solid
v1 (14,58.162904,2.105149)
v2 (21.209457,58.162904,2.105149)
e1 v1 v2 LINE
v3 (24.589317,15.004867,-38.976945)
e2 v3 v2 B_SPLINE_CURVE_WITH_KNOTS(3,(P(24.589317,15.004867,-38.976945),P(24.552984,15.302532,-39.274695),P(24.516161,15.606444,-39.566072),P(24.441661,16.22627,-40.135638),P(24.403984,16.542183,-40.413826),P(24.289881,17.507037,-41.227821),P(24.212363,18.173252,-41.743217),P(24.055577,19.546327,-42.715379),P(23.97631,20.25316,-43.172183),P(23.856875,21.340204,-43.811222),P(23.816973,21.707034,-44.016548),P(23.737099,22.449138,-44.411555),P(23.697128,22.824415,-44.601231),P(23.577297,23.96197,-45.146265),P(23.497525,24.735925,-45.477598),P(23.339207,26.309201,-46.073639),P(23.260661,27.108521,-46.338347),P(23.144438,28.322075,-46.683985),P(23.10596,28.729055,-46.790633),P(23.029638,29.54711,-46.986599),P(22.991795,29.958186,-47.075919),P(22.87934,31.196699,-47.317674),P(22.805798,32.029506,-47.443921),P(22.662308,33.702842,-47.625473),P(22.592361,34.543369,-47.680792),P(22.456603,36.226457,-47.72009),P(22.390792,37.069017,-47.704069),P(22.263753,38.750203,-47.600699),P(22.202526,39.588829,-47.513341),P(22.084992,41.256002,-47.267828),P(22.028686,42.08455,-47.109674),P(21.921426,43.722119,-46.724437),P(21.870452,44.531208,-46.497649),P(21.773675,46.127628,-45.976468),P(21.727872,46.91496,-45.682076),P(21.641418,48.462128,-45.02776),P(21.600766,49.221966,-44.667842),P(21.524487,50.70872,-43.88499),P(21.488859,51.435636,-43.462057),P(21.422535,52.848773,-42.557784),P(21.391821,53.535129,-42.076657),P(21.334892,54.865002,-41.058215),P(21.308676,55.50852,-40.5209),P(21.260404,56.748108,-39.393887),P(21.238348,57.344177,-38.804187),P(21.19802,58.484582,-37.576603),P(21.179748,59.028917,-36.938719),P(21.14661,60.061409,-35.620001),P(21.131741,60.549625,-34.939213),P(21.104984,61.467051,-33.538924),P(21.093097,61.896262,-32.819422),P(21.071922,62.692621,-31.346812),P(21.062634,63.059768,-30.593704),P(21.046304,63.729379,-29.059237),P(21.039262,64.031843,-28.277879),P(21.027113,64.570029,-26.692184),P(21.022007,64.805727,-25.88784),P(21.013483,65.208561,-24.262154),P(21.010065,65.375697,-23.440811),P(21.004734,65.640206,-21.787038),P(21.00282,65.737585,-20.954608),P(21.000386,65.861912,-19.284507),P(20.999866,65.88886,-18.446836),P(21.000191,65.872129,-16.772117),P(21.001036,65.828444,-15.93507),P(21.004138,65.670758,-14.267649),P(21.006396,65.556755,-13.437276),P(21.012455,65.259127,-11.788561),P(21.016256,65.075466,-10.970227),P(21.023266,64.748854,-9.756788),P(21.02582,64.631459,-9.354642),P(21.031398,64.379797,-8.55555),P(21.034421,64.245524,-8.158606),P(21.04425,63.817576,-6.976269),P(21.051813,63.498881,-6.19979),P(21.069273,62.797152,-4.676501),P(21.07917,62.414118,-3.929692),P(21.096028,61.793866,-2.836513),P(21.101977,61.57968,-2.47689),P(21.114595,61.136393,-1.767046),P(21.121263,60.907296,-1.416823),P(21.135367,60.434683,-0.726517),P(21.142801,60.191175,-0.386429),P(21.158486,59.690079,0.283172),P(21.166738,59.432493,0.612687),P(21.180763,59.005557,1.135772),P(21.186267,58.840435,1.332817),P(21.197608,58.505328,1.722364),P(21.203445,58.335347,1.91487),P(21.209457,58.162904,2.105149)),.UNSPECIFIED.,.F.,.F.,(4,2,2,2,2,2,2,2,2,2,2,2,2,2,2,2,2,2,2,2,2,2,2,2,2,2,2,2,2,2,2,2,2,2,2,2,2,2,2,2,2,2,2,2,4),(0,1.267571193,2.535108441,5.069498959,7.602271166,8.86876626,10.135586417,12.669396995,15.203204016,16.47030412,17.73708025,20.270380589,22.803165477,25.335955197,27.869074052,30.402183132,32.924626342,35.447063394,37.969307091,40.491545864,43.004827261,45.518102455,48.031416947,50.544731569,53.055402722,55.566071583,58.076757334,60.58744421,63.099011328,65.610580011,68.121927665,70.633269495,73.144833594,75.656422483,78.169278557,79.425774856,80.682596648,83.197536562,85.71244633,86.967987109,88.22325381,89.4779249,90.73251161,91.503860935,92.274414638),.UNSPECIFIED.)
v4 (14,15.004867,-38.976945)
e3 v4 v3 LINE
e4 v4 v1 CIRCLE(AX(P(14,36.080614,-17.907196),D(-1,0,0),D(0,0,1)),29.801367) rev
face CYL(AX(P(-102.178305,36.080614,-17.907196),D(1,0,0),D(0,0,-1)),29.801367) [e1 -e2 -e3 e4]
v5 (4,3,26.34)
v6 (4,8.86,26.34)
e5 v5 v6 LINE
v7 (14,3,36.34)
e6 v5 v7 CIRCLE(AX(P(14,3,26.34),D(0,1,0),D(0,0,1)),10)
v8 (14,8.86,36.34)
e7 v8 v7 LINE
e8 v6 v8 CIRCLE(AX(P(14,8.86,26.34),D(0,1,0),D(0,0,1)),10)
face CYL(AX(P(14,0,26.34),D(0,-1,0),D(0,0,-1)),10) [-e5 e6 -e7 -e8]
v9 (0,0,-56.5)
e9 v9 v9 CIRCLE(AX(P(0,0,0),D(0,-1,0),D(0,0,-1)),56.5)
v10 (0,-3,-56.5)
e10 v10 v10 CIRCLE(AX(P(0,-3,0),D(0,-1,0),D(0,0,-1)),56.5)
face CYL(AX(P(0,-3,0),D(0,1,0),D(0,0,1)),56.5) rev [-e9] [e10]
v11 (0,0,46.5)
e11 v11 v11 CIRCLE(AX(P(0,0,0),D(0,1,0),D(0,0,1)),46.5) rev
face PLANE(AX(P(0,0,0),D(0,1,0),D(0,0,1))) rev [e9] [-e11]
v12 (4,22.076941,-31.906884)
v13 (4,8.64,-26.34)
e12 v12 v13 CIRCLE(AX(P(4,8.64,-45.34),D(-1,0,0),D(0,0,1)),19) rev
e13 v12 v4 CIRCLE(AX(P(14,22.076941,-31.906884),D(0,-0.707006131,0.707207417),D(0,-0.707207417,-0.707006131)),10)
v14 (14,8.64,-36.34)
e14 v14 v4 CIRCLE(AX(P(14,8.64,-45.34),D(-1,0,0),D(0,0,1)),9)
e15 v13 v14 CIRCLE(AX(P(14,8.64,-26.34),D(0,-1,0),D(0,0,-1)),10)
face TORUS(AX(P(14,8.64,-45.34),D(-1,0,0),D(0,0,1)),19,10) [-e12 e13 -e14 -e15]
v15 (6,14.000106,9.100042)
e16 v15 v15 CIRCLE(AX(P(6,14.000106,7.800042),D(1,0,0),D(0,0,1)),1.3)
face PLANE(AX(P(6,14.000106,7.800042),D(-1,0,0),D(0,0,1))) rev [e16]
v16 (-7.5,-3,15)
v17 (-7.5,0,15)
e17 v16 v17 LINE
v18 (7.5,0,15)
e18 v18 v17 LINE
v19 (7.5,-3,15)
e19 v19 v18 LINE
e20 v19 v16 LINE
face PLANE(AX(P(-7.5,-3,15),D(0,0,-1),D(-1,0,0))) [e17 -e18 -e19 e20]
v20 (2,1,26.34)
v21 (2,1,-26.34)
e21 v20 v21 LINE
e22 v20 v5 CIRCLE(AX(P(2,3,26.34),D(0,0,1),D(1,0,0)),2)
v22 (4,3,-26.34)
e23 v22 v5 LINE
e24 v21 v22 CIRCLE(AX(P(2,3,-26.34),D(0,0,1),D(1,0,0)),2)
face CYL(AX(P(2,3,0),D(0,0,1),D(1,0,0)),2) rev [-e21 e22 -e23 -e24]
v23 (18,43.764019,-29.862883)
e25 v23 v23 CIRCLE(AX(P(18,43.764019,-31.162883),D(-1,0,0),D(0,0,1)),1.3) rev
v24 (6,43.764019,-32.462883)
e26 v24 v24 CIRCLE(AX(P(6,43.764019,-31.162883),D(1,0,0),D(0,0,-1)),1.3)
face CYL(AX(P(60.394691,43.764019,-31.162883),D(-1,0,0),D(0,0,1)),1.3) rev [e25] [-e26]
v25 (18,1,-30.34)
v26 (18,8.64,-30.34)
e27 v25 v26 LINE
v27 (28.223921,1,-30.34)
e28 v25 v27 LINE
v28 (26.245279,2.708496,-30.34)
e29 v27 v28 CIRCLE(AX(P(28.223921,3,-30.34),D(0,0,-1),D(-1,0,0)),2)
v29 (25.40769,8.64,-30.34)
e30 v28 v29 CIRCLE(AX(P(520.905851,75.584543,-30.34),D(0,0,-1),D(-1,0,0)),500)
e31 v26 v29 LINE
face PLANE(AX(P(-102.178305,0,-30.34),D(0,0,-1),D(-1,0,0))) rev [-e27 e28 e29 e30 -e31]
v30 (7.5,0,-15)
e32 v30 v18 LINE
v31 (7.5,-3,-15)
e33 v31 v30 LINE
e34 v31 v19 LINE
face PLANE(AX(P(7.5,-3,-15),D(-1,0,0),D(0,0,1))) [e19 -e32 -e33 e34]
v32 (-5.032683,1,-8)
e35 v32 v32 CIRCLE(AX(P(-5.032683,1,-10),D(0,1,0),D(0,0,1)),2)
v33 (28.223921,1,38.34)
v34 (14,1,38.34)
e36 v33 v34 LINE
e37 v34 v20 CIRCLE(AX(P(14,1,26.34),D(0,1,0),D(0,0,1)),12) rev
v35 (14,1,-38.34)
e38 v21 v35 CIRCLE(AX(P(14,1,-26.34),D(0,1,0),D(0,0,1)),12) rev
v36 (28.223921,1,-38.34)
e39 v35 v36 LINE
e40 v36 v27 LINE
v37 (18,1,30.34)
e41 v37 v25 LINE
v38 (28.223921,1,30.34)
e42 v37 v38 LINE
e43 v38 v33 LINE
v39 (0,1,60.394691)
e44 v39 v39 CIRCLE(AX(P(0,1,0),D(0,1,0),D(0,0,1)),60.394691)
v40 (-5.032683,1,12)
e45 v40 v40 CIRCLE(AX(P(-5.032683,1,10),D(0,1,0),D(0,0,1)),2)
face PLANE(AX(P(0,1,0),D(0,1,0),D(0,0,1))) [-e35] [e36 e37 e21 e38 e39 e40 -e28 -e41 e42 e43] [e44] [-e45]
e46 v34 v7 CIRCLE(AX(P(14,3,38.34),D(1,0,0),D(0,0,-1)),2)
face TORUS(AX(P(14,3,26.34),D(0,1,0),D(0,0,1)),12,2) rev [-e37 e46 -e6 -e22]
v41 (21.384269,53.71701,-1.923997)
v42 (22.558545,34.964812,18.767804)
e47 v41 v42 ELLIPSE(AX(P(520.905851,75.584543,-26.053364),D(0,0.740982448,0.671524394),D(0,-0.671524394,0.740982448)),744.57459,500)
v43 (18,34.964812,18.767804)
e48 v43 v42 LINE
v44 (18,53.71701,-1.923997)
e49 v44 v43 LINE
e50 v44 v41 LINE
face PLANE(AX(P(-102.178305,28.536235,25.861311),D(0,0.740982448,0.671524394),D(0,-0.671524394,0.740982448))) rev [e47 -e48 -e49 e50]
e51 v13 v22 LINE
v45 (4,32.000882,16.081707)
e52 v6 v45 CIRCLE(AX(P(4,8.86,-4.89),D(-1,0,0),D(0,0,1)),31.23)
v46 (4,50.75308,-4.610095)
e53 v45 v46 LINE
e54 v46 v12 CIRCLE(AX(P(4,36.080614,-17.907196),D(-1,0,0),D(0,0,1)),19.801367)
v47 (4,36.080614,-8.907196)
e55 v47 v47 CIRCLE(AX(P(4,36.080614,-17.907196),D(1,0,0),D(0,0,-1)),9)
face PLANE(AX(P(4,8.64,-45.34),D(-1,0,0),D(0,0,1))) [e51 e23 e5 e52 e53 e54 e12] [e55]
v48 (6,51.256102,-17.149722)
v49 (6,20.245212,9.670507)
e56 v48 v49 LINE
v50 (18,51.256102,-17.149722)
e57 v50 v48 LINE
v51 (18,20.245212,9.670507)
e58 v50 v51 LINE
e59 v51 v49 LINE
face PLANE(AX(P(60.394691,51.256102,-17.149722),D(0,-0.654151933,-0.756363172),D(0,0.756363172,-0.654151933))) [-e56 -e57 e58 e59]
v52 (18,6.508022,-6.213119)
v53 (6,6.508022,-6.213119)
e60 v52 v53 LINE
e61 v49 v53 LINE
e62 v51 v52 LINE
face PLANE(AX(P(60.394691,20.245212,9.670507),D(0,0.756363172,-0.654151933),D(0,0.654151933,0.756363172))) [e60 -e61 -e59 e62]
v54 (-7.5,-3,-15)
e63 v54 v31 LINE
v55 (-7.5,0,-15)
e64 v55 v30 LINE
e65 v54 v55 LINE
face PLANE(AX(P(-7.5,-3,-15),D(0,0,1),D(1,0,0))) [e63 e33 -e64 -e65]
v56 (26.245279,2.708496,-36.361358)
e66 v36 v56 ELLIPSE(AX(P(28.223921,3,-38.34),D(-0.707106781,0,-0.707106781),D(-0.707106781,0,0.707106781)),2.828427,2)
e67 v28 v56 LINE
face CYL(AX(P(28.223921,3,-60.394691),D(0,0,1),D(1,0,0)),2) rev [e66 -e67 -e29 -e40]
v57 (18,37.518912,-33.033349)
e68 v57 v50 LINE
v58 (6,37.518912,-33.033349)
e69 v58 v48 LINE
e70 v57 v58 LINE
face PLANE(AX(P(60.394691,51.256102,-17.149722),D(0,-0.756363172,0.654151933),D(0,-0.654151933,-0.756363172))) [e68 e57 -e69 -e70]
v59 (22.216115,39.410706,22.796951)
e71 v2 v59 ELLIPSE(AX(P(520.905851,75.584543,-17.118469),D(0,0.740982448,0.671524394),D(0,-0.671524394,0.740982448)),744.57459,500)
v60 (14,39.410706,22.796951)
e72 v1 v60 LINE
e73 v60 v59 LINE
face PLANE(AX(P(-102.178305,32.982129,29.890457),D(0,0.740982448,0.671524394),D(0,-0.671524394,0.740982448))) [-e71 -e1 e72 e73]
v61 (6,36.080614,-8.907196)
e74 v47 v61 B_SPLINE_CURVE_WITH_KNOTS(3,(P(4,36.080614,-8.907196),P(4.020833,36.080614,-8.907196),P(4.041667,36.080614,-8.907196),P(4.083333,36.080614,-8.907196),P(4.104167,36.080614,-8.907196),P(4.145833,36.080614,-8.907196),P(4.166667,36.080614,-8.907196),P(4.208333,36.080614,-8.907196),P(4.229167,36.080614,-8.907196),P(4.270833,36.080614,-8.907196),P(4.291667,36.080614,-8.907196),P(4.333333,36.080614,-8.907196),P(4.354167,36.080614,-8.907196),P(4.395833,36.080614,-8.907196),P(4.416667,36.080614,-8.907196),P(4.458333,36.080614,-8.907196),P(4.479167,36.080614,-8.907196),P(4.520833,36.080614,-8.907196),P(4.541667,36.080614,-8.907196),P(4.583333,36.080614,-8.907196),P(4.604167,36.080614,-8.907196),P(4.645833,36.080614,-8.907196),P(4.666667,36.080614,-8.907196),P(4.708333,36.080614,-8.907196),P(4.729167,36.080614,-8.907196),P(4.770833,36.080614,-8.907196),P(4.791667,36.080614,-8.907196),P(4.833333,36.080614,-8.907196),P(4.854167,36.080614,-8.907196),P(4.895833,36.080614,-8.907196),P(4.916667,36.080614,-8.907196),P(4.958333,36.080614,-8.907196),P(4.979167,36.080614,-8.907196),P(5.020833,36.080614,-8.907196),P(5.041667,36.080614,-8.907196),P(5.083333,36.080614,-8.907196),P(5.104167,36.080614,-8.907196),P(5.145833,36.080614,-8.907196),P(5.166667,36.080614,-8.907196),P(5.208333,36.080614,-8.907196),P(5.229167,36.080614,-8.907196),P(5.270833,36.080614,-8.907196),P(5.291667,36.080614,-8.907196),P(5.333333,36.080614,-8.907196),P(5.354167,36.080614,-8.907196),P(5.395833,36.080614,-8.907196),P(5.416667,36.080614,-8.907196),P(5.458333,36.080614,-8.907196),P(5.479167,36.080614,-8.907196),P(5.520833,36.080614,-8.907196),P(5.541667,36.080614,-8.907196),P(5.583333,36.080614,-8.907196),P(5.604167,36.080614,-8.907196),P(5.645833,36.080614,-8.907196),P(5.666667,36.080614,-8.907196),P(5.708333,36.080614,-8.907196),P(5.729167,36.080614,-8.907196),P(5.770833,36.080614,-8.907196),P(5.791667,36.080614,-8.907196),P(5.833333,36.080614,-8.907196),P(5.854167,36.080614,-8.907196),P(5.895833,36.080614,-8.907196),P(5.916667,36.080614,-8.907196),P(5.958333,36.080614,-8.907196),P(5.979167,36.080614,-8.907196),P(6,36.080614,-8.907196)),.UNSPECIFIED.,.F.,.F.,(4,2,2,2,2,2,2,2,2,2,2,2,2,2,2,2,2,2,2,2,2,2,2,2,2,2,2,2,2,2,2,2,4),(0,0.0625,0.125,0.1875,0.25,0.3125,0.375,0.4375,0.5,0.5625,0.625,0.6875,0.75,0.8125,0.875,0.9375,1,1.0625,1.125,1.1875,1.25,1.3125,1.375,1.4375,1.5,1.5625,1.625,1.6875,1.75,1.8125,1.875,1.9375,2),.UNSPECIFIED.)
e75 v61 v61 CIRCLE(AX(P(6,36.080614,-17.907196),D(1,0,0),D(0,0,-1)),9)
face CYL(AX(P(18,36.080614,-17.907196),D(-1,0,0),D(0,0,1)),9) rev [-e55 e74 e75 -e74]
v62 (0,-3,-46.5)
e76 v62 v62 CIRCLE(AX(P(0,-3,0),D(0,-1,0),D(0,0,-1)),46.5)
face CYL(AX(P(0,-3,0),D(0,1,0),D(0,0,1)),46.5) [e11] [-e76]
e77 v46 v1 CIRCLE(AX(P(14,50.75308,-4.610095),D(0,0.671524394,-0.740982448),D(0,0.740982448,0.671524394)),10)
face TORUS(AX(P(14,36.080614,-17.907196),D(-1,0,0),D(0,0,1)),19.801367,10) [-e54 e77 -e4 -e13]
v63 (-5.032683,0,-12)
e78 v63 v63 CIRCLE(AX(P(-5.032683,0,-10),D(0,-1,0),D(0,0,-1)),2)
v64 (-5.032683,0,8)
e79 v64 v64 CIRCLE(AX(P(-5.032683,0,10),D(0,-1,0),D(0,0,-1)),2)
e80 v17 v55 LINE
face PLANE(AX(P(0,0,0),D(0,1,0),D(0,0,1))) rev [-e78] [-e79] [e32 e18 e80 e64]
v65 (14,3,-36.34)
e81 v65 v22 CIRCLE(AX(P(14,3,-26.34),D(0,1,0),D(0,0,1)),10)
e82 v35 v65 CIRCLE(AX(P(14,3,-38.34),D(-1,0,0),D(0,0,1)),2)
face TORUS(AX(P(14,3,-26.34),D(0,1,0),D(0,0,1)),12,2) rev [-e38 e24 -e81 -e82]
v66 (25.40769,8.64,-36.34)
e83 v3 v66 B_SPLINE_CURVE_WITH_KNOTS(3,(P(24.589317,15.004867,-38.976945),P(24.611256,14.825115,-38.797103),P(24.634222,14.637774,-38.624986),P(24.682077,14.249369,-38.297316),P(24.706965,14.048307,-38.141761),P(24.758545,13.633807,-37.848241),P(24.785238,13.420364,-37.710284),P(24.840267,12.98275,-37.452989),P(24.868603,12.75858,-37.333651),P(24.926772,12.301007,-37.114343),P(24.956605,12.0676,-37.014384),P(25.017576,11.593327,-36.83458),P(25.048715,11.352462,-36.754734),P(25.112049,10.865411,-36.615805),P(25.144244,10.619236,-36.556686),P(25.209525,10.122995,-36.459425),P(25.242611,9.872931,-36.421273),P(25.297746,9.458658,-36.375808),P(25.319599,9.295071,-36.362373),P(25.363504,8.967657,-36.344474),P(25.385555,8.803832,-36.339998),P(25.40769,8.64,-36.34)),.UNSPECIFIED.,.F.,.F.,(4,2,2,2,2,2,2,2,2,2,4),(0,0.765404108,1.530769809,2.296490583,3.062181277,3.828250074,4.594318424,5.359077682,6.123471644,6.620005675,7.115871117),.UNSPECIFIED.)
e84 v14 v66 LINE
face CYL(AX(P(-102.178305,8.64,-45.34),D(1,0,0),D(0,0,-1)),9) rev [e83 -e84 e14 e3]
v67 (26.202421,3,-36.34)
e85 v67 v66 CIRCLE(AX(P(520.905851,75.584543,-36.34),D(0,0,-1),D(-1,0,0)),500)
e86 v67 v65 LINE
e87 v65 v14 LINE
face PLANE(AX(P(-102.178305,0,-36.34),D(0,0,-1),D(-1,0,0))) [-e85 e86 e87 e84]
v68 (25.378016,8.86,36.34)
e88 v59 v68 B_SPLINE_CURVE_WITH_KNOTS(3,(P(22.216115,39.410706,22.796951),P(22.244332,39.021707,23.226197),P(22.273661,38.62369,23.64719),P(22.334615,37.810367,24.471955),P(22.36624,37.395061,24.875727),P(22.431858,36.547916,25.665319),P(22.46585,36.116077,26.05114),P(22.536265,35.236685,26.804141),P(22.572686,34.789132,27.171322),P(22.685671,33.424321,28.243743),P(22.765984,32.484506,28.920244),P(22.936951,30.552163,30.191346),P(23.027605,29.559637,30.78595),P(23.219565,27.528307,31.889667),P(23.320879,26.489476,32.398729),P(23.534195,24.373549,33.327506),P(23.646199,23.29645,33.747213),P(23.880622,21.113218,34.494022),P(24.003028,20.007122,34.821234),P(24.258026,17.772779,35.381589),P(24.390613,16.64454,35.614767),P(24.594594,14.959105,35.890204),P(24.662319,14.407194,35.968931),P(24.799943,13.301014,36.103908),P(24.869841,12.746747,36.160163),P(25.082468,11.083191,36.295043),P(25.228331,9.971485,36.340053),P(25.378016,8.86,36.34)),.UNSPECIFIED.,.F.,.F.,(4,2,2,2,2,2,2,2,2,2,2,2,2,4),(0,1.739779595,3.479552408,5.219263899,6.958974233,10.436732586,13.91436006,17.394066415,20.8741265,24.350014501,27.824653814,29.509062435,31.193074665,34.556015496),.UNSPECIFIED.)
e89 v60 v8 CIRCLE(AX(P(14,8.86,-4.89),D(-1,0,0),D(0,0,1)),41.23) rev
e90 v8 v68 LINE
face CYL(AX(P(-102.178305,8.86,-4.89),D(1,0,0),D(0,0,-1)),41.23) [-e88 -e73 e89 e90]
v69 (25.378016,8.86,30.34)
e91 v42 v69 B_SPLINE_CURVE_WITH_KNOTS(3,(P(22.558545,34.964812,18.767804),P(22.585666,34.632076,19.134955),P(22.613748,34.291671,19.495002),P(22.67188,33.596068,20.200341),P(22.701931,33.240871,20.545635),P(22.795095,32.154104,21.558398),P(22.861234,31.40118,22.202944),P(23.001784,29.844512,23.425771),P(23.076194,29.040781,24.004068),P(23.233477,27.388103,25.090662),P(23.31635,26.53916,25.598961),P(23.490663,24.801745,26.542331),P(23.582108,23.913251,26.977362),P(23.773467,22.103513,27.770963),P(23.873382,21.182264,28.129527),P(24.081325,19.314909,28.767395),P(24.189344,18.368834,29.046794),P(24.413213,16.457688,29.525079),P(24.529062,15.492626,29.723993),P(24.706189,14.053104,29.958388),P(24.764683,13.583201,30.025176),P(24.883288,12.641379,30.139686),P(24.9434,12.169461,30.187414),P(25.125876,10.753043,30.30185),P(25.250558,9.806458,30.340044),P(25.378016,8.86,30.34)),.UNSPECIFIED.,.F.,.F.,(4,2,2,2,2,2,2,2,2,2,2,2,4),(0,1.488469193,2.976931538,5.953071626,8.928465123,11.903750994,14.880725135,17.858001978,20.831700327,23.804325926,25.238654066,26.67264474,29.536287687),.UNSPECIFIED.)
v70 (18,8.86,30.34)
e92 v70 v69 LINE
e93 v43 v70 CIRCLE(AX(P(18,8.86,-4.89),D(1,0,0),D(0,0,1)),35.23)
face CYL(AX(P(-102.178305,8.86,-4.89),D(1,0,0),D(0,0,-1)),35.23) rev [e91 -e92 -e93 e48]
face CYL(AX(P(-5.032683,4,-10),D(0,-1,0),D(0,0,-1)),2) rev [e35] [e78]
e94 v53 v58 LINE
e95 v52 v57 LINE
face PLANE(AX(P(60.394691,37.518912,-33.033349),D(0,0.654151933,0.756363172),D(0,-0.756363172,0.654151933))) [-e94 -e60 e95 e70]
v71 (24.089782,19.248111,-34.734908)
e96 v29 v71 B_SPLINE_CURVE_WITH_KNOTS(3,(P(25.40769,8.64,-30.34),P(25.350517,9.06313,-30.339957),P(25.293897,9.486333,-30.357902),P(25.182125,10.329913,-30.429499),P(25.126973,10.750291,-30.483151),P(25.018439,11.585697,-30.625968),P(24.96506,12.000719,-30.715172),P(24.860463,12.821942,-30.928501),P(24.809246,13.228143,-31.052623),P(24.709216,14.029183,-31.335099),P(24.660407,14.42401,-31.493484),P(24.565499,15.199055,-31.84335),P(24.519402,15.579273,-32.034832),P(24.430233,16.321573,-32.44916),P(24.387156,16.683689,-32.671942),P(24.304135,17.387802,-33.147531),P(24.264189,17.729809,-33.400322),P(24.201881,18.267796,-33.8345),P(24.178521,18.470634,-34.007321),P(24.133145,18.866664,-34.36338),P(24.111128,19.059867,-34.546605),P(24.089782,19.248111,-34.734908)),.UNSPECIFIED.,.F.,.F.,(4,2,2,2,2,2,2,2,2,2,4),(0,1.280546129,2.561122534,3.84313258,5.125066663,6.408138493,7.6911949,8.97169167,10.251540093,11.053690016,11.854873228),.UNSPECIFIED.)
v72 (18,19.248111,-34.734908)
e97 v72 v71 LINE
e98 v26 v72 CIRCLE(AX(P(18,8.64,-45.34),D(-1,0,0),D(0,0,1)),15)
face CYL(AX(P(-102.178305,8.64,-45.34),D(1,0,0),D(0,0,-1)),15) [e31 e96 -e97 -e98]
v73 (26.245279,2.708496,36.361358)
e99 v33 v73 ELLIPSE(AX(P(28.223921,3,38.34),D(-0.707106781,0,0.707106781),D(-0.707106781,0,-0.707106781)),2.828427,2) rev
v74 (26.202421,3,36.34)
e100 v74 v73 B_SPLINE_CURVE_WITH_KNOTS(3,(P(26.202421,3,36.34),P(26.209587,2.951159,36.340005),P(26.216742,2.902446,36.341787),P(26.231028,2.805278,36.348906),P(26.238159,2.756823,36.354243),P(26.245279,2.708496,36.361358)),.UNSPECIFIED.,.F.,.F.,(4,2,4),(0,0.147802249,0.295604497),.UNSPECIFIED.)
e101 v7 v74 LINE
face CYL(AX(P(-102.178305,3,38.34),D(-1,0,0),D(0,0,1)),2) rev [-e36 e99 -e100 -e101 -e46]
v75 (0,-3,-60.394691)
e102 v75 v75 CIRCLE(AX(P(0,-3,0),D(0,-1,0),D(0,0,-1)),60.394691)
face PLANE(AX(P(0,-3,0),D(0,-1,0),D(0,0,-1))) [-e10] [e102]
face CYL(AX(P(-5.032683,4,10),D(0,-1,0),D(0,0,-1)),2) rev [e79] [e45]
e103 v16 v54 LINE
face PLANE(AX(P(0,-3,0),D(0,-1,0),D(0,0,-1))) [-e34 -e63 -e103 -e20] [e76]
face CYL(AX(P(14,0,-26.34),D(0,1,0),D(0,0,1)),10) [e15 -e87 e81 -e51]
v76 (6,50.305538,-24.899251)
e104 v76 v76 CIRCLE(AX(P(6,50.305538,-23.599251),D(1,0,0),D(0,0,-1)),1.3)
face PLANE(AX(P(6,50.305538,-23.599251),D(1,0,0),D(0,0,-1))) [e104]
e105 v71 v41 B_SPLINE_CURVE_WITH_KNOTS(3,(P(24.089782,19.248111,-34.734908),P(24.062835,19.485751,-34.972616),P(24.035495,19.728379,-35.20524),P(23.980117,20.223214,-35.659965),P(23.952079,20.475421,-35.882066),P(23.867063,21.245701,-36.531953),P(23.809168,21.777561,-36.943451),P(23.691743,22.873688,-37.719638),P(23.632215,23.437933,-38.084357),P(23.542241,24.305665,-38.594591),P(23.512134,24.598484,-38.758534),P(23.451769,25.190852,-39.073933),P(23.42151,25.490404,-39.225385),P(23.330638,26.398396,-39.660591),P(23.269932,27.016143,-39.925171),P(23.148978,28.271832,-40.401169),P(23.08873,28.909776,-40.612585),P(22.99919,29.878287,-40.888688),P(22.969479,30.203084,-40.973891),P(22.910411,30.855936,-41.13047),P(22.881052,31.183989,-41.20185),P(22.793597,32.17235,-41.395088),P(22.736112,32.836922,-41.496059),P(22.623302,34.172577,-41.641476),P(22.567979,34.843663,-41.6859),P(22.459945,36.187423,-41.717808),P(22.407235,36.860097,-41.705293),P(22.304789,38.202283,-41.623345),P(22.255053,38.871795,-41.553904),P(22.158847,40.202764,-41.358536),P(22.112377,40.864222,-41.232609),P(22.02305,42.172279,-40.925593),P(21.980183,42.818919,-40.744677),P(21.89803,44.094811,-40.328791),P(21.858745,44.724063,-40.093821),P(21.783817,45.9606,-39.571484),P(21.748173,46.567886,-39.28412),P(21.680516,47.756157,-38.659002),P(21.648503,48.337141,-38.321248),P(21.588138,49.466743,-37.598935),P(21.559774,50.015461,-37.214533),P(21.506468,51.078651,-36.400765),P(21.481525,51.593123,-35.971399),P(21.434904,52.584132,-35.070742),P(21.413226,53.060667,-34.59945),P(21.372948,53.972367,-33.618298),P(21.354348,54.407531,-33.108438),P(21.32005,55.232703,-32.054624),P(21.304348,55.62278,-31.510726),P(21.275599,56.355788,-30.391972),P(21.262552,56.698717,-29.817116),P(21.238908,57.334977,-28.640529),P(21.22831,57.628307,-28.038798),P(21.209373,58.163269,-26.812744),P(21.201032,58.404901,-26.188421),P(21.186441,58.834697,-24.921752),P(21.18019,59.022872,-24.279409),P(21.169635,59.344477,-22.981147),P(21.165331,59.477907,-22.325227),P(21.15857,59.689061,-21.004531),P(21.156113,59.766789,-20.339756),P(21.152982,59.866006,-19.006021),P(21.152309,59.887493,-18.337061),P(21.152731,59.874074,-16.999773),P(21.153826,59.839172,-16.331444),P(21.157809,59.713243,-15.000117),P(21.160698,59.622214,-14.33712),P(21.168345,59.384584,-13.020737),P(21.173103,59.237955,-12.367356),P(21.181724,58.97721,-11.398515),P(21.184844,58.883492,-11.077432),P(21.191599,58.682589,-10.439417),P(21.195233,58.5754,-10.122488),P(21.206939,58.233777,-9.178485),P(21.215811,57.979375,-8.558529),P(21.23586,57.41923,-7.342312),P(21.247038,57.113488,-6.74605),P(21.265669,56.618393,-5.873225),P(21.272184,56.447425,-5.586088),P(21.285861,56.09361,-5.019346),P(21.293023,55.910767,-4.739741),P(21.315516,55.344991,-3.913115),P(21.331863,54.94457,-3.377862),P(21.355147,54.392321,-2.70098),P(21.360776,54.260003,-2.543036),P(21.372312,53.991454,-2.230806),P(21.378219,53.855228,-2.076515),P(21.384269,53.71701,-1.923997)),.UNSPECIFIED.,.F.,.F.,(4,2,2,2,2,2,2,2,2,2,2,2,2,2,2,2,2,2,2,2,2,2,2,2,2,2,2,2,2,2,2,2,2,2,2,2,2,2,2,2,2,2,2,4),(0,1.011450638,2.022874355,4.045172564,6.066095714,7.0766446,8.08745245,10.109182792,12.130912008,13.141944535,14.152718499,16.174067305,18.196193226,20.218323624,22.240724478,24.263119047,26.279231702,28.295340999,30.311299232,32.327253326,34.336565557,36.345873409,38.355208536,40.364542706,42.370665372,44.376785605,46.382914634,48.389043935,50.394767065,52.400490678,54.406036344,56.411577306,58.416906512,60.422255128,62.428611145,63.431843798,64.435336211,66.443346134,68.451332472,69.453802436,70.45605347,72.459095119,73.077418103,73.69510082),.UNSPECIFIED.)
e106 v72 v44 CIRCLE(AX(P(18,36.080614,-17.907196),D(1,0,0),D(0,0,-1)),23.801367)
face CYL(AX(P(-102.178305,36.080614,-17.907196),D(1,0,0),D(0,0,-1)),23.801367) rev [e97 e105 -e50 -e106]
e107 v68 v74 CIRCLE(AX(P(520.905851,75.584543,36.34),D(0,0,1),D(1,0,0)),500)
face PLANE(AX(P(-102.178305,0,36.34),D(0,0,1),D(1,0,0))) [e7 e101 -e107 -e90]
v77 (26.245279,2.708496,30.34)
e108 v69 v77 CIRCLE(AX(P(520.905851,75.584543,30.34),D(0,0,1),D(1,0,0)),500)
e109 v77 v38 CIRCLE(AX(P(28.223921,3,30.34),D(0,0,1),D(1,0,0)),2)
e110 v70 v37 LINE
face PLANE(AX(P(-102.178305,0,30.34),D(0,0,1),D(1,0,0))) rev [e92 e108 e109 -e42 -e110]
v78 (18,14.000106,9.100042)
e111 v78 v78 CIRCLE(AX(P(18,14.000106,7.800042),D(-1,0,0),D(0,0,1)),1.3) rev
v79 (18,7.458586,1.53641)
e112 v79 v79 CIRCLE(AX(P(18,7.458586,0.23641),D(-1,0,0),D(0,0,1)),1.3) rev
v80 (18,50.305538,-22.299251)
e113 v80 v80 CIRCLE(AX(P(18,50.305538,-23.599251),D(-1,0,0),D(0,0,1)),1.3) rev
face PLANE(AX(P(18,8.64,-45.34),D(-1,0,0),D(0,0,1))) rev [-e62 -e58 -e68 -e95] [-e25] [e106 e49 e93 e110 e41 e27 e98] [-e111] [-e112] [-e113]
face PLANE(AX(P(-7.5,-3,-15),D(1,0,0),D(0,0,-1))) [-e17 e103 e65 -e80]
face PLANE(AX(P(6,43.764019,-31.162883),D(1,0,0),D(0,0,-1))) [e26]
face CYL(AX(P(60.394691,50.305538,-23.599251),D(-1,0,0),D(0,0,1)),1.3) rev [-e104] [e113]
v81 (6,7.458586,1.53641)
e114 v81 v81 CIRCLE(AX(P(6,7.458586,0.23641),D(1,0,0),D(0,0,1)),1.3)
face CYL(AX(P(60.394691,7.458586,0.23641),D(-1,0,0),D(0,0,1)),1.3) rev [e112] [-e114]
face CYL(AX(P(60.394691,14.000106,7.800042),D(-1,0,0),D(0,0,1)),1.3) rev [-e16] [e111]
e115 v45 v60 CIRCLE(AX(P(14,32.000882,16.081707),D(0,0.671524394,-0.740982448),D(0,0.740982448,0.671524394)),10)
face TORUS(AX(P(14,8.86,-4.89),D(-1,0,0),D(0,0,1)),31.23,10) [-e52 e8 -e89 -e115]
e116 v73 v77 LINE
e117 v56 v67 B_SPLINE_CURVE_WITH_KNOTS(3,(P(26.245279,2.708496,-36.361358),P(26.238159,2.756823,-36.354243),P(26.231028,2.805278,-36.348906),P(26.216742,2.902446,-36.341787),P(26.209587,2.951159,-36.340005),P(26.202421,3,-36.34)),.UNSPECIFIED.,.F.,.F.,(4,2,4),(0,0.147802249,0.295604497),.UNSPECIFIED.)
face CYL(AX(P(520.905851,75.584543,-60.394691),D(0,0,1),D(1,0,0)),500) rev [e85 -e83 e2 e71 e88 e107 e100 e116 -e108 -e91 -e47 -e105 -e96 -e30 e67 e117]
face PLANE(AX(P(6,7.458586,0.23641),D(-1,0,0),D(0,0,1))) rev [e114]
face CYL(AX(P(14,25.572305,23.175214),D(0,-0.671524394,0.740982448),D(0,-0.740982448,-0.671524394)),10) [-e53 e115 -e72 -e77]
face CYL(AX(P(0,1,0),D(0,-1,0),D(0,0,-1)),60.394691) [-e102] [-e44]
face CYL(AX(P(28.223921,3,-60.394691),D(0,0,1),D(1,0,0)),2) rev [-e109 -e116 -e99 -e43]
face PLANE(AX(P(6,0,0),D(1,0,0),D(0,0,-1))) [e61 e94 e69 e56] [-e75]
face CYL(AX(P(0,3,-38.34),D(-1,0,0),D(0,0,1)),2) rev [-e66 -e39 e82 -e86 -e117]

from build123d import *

# Parameters (mm, degrees)
SKETCH1_R                = 60.394691442
BOSS_EXTRUDE1_DEPTH      = 1
BOSS_EXTRUDE3_START      = 4
SKETCH3_R                = 9
BOSS_EXTRUDE3_DEPTH      = 14
CUT_EXTRUDE1_START       = 6
SKETCH4_R                = 1.3
CUT_EXTRUDE1_DEPTH       = 99.311500824
BOSS_EXTRUDE4_DEPTH      = 9
BOSS_EXTRUDE4_DEPTH_BACK = 14
CUT_EXTRUDE2_DEPTH       = 108.867849616
CUT_EXTRUDE2_DEPTH_BACK  = 108.867849616
FILLET1_R                = 10
FILLET3_R                = 2
BOSS_EXTRUDE9_START      = 3
SKETCH11_R               = 60.394691442
SKETCH11_R_2             = 56.5
BOSS_EXTRUDE9_DEPTH      = 3
SKETCH14_R               = 46.5
SKETCH14_W               = 15
SKETCH14_H               = 30
BOSS_EXTRUDE12_DEPTH     = 3
SKETCH16_R               = 2
CUT_EXTRUDE3_DEPTH       = 4


with BuildPart() as part:
    # Sketch1 → Boss-Extrude1 (new body)
    with BuildSketch(Plane(origin=(0, 0, 0), x_dir=(1, 0, 0), z_dir=(0, 1, 0))):
        with Locations(Location((0, 0, 0), (0, 0, 270))):
            Circle(SKETCH1_R)
    extrude(amount=BOSS_EXTRUDE1_DEPTH)

    # Sketch3 → Boss-Extrude3 (add)
    with BuildSketch(Plane(origin=(0, 0, 0), x_dir=(0, 0, -1), z_dir=(1, 0, 0)).offset(BOSS_EXTRUDE3_START)):
        with BuildLine():
            Line((-30.34, 1), (30.34, 1))
            Line((30.34, 1), (30.34, 8.64))
            ThreePointArc((30.34, 8.64), (31.482215556, 14.381237698), (34.73490804, 19.248111261))
            ThreePointArc((34.73490804, 19.248111261), (35.146816919, 52.490993137), (1.923997232, 53.717009602))
            Line((1.923997232, 53.717009602), (-18.767804398, 34.964811646))
            ThreePointArc((-18.767804398, 34.964811646), (-27.317276732, 23.137402619), (-30.34, 8.86))
            Line((-30.34, 8.86), (-30.34, 1))
        make_face()
        with Locations(Location((17.907195719, 36.080614483, 0), (0, 0, 180))):
            Circle(SKETCH3_R, mode=Mode.SUBTRACT)
    extrude(amount=BOSS_EXTRUDE3_DEPTH)

    # Sketch4 → Cut-Extrude1 (cut, through all)
    with BuildSketch(Plane(origin=(0, 0, 0), x_dir=(0, 0, -1), z_dir=(1, 0, 0)).offset(CUT_EXTRUDE1_START)):
        with Locations(Location((23.599251188, 50.305537875, 0), (0, 0, 180))):
            Circle(SKETCH4_R)
        with Locations(Location((31.162882913, 43.764018545, 0), (0, 0, 180))):
            Circle(SKETCH4_R)
        with Locations(Location((-0.236409868, 7.458586268, 0), (0, 0, 180))):
            Circle(SKETCH4_R)
        with Locations(Location((-7.800041592, 14.000105597, 0), (0, 0, 180))):
            Circle(SKETCH4_R)
        Polygon((17.149721975, 51.256102402), (33.033348596, 37.518911811), (6.213119346, 6.50802174), (-9.670507276, 20.245212332), align=None)
    extrude(amount=CUT_EXTRUDE1_DEPTH, mode=Mode.SUBTRACT)

    # Sketch8 → Boss-Extrude4 (add, two sides: drawn at the far end of the back side and taken through both)
    with BuildSketch(Plane(origin=(18, 0, 0), x_dir=(0, 0, -1), z_dir=(1, 0, 0)).offset(-BOSS_EXTRUDE4_DEPTH_BACK)):
        with BuildLine():
            Line((-30.34, 1), (-30.34, 8.86))
            ThreePointArc((-30.34, 8.86), (-27.317276732, 23.137402619), (-18.767804398, 34.964811646))
            Line((-18.767804398, 34.964811646), (1.923997232, 53.717009602))
            ThreePointArc((1.923997232, 53.717009602), (35.146816919, 52.490993137), (34.73490804, 19.248111261))
            ThreePointArc((34.73490804, 19.248111261), (31.482215556, 14.381237698), (30.34, 8.64))
            Line((30.34, 8.64), (30.34, 1))
            Line((30.34, 1), (36.34, 1))
            Line((36.34, 1), (36.34, 8.64))
            ThreePointArc((36.34, 8.64), (37.025329334, 12.084742619), (38.976944824, 15.004866757))
            ThreePointArc((38.976944824, 15.004866757), (39.492690314, 56.627825795), (-2.105149131, 58.162904291))
            Line((-2.105149131, 58.162904291), (-22.796950761, 39.410706335))
            ThreePointArc((-22.796950761, 39.410706335), (-32.802478559, 25.568978426), (-36.34, 8.86))
            Line((-36.34, 8.86), (-36.34, 1))
            Line((-36.34, 1), (-30.34, 1))
        make_face()
    extrude(amount=BOSS_EXTRUDE4_DEPTH + BOSS_EXTRUDE4_DEPTH_BACK)

    # Sketch10 → Cut-Extrude2 (cut, two sides: drawn at the far end of the back side and taken through both)
    with BuildSketch(Plane.XY.offset(-CUT_EXTRUDE2_DEPTH_BACK)):
        with BuildLine():
            Line((27, 65.881981391), (21, 65.881981391))
            ThreePointArc((21, 65.881981391), (22.692685718, 33.351362906), (26.5, 1))
            Line((26.5, 1), (27, 1))
            Line((27, 1), (27, 65.881981391))
        make_face()
    extrude(amount=CUT_EXTRUDE2_DEPTH + CUT_EXTRUDE2_DEPTH_BACK, mode=Mode.SUBTRACT)

    # Fillet1
    fillet1_edges = [part.edges().sort_by_distance(p)[0] for p in [
        (4, 12.084742619, -37.025329334),
        (4, 25.568978426, 32.802478559),
        (4, 4.93, 36.34),
        (4, 4.82, -36.34),
        (4, 56.627825795, -39.492690314),
        (4, 48.786805313, 12.451049946),
    ]]
    fillet(fillet1_edges, radius=FILLET1_R)

    # Fillet3
    fillet3_edges = [part.edges().sort_by_distance(p)[0] for p in [
        (20.25, 1, -36.34),
        (6.928932188, 1, -33.411067812),
        (4, 1, 0),
        (6.928932188, 1, 33.411067812),
        (20.25, 1, 36.34),
    ]]
    fillet(fillet3_edges, radius=FILLET3_R)
    fillet3_2_edges = [part.edges().sort_by_distance(p)[0] for p in [
        (26.5, 1, -33.34),
    ]]
    fillet(fillet3_2_edges, radius=FILLET3_R)
    fillet3_3_edges = [part.edges().sort_by_distance(p)[0] for p in [
        (26.5, 1, 33.34),
    ]]
    fillet(fillet3_3_edges, radius=FILLET3_R)

    # Sketch11 → Boss-Extrude9 (add)
    with BuildSketch(Plane.XZ.offset(BOSS_EXTRUDE9_START)):
        with Locations(Location((0, 0, 0), (0, 0, 270))):
            Circle(SKETCH11_R)
        with Locations(Location((0, 0, 0), (0, 0, 270))):
            Circle(SKETCH11_R_2, mode=Mode.SUBTRACT)
    extrude(amount=-BOSS_EXTRUDE9_DEPTH)

    # Sketch14 → Boss-Extrude12 (add)
    with BuildSketch(Plane(origin=(0, 0, 0), x_dir=(-1, 0, 0), z_dir=(0, -1, 0))):
        with Locations(Location((0, 0, 0), (0, 0, 270))):
            Circle(SKETCH14_R)
        Rectangle(SKETCH14_W, SKETCH14_H, mode=Mode.SUBTRACT)
    extrude(amount=BOSS_EXTRUDE12_DEPTH)

    # Sketch16 → Cut-Extrude3 (cut)
    with BuildSketch(Plane(origin=(0, 0, 0), x_dir=(-1, 0, 0), z_dir=(0, -1, 0))):
        with Locations(Location((5.032683159, 10, 0), (0, 0, 90))):
            Circle(SKETCH16_R)
        with Locations(Location((5.032683159, -10, 0), (0, 0, 90))):
            Circle(SKETCH16_R)
    extrude(amount=-CUT_EXTRUDE3_DEPTH, mode=Mode.SUBTRACT)


solid = part.part
